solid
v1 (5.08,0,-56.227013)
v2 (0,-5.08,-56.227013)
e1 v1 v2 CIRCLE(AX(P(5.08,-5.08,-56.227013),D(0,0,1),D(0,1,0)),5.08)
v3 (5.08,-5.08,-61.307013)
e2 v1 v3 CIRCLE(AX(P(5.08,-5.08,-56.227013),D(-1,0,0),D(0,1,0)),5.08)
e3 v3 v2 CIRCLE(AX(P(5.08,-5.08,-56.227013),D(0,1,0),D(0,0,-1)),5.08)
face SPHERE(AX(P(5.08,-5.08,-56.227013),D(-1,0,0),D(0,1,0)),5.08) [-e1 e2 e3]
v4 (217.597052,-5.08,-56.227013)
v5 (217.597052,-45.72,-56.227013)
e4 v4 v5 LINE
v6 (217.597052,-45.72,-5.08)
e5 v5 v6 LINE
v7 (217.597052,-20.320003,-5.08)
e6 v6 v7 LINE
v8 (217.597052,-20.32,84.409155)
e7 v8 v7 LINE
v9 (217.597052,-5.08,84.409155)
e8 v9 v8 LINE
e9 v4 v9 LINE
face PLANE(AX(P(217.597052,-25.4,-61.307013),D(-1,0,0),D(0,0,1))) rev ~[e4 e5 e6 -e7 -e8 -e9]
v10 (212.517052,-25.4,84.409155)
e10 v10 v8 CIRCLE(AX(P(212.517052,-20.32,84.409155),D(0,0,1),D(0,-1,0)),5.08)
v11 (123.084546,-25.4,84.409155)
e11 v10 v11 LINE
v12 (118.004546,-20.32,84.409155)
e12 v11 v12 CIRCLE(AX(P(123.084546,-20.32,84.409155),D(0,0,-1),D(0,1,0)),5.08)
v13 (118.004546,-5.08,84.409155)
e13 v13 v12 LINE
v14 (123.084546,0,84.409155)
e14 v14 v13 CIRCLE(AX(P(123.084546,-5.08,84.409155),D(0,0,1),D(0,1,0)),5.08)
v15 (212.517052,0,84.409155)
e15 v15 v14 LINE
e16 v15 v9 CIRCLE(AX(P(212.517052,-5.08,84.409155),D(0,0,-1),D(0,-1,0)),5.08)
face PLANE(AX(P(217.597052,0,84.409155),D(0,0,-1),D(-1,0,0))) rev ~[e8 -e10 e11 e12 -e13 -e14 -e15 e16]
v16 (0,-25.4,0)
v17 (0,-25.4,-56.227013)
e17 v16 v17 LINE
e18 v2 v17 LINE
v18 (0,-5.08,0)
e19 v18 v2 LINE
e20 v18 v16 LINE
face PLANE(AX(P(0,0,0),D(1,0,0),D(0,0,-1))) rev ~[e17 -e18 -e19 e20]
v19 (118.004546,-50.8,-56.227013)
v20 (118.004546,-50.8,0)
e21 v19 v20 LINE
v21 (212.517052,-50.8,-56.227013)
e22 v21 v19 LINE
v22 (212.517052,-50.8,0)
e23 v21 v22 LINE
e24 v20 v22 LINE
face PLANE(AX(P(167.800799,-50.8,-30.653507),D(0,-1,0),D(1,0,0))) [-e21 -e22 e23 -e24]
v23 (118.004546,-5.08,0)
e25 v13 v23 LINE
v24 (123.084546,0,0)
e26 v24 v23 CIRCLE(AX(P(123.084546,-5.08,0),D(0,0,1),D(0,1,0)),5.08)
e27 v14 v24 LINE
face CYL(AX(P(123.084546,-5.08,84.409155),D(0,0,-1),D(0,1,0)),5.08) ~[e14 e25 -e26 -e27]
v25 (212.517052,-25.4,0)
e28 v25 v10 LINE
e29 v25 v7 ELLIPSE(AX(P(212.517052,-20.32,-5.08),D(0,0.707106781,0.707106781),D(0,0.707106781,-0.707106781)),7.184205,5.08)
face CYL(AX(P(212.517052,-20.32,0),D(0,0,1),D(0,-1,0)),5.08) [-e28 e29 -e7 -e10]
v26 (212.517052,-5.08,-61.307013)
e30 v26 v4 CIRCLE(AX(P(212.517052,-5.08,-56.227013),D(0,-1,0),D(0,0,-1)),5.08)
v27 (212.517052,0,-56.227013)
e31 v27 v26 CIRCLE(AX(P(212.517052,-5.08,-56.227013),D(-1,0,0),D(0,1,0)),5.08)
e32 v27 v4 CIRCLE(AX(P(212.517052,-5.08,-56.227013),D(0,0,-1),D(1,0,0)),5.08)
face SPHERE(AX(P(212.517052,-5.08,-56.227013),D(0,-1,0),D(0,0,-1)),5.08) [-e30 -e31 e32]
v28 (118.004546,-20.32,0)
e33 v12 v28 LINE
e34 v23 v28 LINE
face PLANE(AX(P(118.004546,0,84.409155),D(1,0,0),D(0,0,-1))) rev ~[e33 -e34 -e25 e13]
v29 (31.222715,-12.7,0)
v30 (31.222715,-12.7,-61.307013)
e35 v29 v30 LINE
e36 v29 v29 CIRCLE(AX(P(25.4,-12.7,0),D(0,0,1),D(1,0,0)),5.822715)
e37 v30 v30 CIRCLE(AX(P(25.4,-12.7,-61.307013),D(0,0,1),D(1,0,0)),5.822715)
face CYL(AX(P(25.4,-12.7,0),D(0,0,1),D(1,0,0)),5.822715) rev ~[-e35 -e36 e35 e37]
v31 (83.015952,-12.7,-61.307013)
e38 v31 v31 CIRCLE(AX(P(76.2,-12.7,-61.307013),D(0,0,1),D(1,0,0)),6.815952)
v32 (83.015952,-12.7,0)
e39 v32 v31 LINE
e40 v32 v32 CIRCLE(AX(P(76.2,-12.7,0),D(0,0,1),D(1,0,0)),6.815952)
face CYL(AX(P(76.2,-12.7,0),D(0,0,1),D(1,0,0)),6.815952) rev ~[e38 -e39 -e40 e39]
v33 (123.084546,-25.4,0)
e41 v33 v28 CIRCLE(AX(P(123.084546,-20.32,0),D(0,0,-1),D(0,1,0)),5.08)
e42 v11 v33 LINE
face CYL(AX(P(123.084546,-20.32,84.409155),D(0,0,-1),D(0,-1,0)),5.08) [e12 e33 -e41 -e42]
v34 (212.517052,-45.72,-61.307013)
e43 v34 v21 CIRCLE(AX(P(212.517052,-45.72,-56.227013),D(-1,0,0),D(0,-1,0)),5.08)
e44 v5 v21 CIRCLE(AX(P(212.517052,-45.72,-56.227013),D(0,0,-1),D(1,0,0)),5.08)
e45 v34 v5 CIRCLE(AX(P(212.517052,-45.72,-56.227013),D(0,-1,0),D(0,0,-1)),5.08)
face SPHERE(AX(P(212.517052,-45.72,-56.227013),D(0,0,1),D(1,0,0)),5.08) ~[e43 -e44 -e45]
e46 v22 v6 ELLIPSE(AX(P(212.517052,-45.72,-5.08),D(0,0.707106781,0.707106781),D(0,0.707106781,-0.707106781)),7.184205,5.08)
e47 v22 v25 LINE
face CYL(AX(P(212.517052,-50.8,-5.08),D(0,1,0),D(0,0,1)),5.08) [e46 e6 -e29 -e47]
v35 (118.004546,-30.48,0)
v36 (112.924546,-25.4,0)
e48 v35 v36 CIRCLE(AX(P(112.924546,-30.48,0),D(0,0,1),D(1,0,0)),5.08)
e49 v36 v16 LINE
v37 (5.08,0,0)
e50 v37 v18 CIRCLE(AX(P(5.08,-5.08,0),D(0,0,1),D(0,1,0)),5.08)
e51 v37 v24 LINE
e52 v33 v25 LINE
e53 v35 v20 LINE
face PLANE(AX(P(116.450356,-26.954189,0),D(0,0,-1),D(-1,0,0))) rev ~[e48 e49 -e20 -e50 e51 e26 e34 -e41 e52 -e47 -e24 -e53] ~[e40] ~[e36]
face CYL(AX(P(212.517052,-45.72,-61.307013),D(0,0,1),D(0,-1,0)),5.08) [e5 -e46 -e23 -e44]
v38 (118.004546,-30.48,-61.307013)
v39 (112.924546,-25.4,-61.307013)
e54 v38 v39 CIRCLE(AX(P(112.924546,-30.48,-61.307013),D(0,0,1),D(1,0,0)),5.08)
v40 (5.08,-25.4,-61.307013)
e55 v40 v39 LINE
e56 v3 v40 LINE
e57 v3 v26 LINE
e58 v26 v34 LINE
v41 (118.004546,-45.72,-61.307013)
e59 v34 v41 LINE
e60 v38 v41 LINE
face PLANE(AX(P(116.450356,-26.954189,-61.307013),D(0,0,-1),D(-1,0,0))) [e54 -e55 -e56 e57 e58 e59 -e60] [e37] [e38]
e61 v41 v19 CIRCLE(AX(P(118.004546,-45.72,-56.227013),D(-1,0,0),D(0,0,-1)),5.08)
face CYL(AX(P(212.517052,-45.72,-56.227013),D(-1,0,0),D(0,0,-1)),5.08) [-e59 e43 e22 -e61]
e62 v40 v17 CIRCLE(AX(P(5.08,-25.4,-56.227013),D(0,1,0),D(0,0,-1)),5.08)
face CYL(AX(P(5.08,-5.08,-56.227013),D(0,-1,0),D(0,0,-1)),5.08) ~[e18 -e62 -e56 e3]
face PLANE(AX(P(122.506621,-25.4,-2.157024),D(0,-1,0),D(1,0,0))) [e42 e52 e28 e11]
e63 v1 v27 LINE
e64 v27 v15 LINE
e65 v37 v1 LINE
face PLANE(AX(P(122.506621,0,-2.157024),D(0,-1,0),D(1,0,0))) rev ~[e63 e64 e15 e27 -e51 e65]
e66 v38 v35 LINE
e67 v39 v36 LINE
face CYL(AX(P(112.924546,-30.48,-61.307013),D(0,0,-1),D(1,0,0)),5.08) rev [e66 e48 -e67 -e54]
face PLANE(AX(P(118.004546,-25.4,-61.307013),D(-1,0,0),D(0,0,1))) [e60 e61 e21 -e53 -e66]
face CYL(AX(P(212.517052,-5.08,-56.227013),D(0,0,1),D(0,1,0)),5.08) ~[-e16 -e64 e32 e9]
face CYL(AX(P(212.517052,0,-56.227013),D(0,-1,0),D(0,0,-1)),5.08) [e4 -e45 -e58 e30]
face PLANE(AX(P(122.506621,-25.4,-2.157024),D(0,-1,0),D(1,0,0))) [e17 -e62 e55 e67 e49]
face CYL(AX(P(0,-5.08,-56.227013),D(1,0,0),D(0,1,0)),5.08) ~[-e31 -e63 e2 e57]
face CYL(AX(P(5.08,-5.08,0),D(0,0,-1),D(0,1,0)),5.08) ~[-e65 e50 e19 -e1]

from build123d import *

# Parameters (mm, degrees)
F1_DEPTH    = 25.4
F2_R        = 5.8227150046
F2_R_2      = 6.8159523424
F3_DEPTH    = 152.4
F4_W        = 99.5925068855
F4_H        = 61.3070130348
F5_DEPTH    = 25.4
F6_T1_DEPTH = 61.3070130348
F7_R        = 5.08
F8_R        = 5.08
F9_R        = 5.08
F10_R       = 5.08
F11_R       = 5.08
F12_R       = 5.08
F13_R       = 5.08


# Not quite as in the source:
# - a fillet or chamfer that OpenCascade refuses, or shapes differently, is made with other operations: its cross-section is extruded or revolved along the edge and cut away or added


with BuildPart() as f1:
    # F0 (on Front) → F1 (new body)
    with BuildSketch(Plane.XZ):
        Polygon((118.0045455694, 0), (0, 0), (0, -61.3070130348), (217.5970524549, -61.3070130348), (217.5970524549, 84.4091549516), (118.0045455694, 84.4091549516), align=None)
    extrude(amount=F1_DEPTH)

    # F2 (on face) → F3 (cut)
    with BuildSketch(Plane.XY):
        with Locations((25.4, -12.7)):
            Circle(F2_R)
        with Locations((76.2, -12.7)):
            Circle(F2_R_2)
    extrude(amount=-F3_DEPTH, mode=Mode.SUBTRACT)

    # F4 (on face) → F5 (join)
    with BuildSketch(Plane.XZ.offset(25.4)):
        with Locations((167.8007990122, -30.6535065174)):
            Rectangle(F4_W, F4_H)
    extrude(amount=F5_DEPTH)

    # F6: fillet of radius 5.08 on 1 edges, made by hand

    # F6_s2 → F6_t1 (join)
    with BuildSketch(Plane.XY.offset(-61.3070130348)):
        with BuildLine():
            ThreePointArc((118.0045455694, -30.48), (116.5166480178, -26.8878975516), (112.9245455694, -25.4))
            Line((112.9245455694, -25.4), (118.0045455694, -25.4))
            Line((118.0045455694, -25.4), (118.0045455694, -30.48))
        make_face()
    extrude(amount=F6_T1_DEPTH)

    # F7
    f7_edges = [f1.edges().sort_by_distance(p)[0] for p in [
        (118.004546, -25.4, 42.204577),
    ]]
    fillet(f7_edges, radius=F7_R)

    # F8
    f8_edges = [f1.edges().sort_by_distance(p)[0] for p in [
        (217.597052, -25.4, 42.204577),
    ]]
    fillet(f8_edges, radius=F8_R)

    # F9
    f9_edges = [f1.edges().sort_by_distance(p)[0] for p in [
        (217.597052, -38.1, 0),
        (217.597052, -50.8, -30.653507),
    ]]
    fillet(f9_edges, radius=F9_R)

    # F10
    f10_edges = [f1.edges().sort_by_distance(p)[0] for p in [
        (217.597052, -22.86, -61.307013),
    ]]
    fillet(f10_edges, radius=F10_R)

    # F11
    f11_edges = [f1.edges().sort_by_distance(p)[0] for p in [
        (217.597052, 0, 14.091071),
    ]]
    fillet(f11_edges, radius=F11_R)

    # F12
    f12_edges = [f1.edges().sort_by_distance(p)[0] for p in [
        (118.004546, 0, 42.204577),
    ]]
    fillet(f12_edges, radius=F12_R)

    # F13
    f13_edges = [f1.edges().sort_by_distance(p)[0] for p in [
        (0, 0, -28.113507),
        (0, -1.487898, -59.819115),
        (0, -15.24, -61.307013),
    ]]
    fillet(f13_edges, radius=F13_R)


solid = f1.part
